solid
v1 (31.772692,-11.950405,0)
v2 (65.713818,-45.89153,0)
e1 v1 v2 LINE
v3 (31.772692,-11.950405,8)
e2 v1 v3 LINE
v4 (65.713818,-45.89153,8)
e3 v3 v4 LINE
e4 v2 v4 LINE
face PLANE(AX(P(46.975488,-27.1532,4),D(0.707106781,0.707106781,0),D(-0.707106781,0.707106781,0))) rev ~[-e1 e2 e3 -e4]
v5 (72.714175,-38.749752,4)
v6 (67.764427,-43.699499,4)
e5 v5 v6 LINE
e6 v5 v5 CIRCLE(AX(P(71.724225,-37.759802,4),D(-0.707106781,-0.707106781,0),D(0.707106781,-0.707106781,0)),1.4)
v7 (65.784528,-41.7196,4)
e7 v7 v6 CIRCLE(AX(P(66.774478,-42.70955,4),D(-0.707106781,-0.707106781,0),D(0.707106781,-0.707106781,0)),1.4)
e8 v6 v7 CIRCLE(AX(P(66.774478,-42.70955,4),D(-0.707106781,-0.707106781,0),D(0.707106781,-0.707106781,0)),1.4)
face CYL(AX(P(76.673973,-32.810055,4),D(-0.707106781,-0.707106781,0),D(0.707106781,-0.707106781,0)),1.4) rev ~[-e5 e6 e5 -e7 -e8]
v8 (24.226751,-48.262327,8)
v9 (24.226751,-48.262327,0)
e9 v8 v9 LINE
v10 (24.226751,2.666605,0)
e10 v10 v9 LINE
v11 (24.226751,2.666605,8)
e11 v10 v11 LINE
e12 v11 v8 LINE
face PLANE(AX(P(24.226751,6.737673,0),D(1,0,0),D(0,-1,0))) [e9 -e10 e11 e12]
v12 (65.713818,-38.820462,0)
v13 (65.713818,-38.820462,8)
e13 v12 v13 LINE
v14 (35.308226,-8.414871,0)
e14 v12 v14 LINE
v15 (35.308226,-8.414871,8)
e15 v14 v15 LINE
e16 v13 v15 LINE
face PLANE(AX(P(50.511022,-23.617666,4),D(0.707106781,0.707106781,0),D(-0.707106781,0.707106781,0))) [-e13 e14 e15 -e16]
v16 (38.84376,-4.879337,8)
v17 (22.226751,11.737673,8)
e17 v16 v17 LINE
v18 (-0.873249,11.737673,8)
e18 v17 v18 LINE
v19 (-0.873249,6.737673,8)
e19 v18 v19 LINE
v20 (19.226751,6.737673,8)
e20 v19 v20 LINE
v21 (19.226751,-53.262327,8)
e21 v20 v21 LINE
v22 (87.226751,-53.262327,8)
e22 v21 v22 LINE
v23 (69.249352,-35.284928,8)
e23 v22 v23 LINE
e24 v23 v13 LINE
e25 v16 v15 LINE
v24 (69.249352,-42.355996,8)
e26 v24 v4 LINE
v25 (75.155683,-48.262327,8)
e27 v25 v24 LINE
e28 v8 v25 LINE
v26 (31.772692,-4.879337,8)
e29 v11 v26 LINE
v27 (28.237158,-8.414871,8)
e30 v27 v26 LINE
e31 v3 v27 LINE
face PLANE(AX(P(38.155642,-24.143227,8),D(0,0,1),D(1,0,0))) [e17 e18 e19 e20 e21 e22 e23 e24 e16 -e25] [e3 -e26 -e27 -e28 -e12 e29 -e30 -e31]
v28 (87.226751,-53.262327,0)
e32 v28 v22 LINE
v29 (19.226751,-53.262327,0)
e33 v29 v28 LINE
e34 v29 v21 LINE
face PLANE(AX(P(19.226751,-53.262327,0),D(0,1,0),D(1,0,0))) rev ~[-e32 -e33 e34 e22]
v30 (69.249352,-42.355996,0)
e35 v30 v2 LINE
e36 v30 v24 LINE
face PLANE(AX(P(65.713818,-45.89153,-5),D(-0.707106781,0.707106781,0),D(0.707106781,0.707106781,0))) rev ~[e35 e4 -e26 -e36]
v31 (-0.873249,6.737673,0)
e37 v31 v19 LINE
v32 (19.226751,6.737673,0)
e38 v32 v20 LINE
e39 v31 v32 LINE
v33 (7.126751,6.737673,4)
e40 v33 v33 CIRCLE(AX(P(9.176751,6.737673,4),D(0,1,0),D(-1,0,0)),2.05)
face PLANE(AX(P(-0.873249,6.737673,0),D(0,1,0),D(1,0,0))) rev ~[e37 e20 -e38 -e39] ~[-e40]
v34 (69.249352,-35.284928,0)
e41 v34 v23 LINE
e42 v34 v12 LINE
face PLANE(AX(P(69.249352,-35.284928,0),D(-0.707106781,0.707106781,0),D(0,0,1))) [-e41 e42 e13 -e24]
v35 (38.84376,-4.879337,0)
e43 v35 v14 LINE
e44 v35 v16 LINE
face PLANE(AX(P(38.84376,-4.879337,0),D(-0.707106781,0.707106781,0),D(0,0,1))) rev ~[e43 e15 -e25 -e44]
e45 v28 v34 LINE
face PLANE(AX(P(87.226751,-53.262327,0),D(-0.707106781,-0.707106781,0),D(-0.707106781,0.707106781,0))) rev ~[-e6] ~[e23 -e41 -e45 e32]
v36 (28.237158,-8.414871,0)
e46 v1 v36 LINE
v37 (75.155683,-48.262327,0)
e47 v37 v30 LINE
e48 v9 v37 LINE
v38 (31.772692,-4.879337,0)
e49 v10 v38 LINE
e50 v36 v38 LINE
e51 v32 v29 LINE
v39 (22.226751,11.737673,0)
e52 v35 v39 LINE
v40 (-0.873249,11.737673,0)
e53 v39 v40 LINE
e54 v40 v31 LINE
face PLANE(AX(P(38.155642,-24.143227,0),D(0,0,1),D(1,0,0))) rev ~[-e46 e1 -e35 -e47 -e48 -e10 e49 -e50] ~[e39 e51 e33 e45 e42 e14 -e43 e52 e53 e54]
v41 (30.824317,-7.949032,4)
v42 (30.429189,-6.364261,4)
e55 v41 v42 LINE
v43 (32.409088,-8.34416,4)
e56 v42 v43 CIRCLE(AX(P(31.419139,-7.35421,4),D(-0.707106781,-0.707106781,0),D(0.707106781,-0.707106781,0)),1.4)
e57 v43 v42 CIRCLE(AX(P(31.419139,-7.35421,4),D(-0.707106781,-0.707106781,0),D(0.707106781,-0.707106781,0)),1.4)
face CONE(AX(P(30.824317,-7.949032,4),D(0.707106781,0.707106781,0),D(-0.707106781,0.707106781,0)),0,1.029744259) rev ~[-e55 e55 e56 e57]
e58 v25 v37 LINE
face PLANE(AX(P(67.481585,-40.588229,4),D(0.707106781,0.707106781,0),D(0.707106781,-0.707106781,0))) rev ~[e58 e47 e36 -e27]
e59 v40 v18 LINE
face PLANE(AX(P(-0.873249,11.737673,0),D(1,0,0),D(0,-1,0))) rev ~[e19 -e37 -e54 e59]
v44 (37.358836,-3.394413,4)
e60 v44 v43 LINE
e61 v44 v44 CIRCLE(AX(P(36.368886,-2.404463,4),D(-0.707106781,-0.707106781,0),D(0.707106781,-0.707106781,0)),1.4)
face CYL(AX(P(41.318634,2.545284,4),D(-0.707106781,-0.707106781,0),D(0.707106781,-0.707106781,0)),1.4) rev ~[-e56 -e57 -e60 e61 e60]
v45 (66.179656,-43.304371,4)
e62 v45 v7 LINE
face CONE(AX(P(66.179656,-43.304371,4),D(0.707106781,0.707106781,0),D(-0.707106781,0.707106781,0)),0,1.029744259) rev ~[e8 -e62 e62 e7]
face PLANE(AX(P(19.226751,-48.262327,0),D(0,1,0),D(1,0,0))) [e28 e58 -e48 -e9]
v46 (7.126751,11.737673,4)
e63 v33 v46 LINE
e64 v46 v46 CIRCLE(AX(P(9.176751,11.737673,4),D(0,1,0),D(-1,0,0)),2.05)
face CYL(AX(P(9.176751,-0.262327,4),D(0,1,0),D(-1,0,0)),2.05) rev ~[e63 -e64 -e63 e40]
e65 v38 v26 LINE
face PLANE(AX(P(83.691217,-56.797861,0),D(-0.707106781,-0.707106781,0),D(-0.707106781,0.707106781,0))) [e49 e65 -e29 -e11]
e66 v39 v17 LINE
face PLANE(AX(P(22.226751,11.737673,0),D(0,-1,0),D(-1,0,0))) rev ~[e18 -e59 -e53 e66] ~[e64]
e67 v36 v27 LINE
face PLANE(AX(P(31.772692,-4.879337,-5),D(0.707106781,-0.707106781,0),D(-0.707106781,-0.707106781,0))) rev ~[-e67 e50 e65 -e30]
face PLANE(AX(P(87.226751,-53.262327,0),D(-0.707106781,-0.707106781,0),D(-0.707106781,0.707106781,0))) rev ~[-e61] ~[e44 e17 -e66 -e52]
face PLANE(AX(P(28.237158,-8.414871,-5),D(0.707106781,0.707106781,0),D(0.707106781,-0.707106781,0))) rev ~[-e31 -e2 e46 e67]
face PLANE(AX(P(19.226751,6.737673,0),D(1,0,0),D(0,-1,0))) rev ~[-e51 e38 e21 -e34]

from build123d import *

# Parameters (mm, degrees)
F1_DEPTH    = 8
F3_D        = 4.1
F3_DEPTH    = 7
F3_TIP      = 1.231764269
F4_W        = 43
F4_H        = 8
F5_DEPTH    = 5
F6_T        = 5
F6_T3_DEPTH = 18
F7_D        = 2.8
F7_DEPTH    = 7
F7_TIP      = 0.8412048666


# Not quite as in the source:
# - a shell that OpenCascade refuses in one call is made with other operations: the cavity is built on its own and cut out


with BuildPart() as f1:
    # F0 (on Top) → F1 (new body)
    with BuildSketch(Plane.XY):
        Polygon((22.2267507434, 11.7376726019), (-0.8732492566, 11.7376726019), (-0.8732492566, 6.7376726019), (19.2267507434, 6.7376726019), (19.2267507434, -53.2623273981), (87.2267507434, -53.2623273981), align=None)
    extrude(amount=F1_DEPTH)

    # F3
    with Locations(Plane.XZ.offset(-6.7376726019)):
        with Locations((9.1767507434, 4)):
            Hole(F3_D / 2, depth=F3_DEPTH)
            with Locations((0, 0, -(F3_DEPTH + F3_TIP / 2))):  # 118° drill point
                Cone(0, F3_D / 2, F3_TIP, mode=Mode.SUBTRACT)

    # F4 (on face) → F5 (cut)
    with BuildSketch(Plane(origin=(16.9822116726, 16.9822116726, 0), x_dir=(-0.7071067812, 0.7071067812, 0), z_dir=(0.7071067812, 0.7071067812, 0))):
        with Locations((-52.4168982823, 4)):
            Rectangle(F4_W, F4_H)
    extrude(amount=-F5_DEPTH, mode=Mode.SUBTRACT)

    # F6: shell of thickness 5, made by hand


with BuildPart() as f6_core1:
    # F6_t2: copy of F1
    add(f1.part)

    # the walls: a layer under each face that stays
    f6_faces = [f6_core1.faces().sort_by_distance(p)[0] for p in [
        (18.3767507434, 11.7376726019, 6.6666666667),
        (30.5352554223, 3.4291679229, 4),
        (-0.8732492566, 9.2376726019, 4),
        (7.1267507434, 9.2376726019, 4),
        (37.0759931483, -6.647103709, 4),
        (50.5110219908, -23.6176664575, 4),
        (67.4815847393, -37.0526953, 4),
        (78.2380512178, -44.2736278726, 4),
        (53.2267507434, -53.2623273981, 4),
        (19.2267507434, -23.2623273981, 4),
        (2.4767507434, 6.7376726019, 6.6666666667),
    ]]
    thicken(f6_faces, amount=-F6_T, mode=Mode.SUBTRACT)

    # F6_s4 → F6_t3 (cut)
    with BuildSketch(Plane.XY.offset(-5)):
        Polygon((35.3789368734, -8.414870662), (31.7726922894, -4.879336756), (28.2371583834, -8.414870662), (31.7726922894, -11.9504045679), align=None)
        Polygon((65.7138177863, -38.7497515749), (62.1782838804, -42.3559961589), (65.7138177863, -45.8915300648), (69.2493516923, -42.3559961589), align=None)
        Polygon((19.1767507434, 6.6876726019), (24.2267507434, 6.7376726019), (24.2267507434, 11.7376726019), (19.2267507434, 11.7376726019), align=None)
    extrude(amount=F6_T3_DEPTH, mode=Mode.SUBTRACT)


with BuildPart() as f1_1:
    add(f1.part)

    # what is left inside the walls is the cavity
    f6_cavity = [f6_core1.part.solids().sort_by_distance(p)[0] for p in [
        (49.691217, -31.286017, 0.05),
    ]]
    add(f6_cavity, mode=Mode.SUBTRACT)

    # F7
    with Locations(Plane(origin=(16.9822116726, 16.9822116726, 0), x_dir=(-0.7071067812, 0.7071067812, 0), z_dir=(0.7071067812, 0.7071067812, 0))):
        with Locations((-27.4168982823, 4), (-77.4168982823, 4)):
            Hole(F7_D / 2, depth=F7_DEPTH)
            with Locations((0, 0, -(F7_DEPTH + F7_TIP / 2))):  # 118° drill point
                Cone(0, F7_D / 2, F7_TIP, mode=Mode.SUBTRACT)


solid = f1_1.part
